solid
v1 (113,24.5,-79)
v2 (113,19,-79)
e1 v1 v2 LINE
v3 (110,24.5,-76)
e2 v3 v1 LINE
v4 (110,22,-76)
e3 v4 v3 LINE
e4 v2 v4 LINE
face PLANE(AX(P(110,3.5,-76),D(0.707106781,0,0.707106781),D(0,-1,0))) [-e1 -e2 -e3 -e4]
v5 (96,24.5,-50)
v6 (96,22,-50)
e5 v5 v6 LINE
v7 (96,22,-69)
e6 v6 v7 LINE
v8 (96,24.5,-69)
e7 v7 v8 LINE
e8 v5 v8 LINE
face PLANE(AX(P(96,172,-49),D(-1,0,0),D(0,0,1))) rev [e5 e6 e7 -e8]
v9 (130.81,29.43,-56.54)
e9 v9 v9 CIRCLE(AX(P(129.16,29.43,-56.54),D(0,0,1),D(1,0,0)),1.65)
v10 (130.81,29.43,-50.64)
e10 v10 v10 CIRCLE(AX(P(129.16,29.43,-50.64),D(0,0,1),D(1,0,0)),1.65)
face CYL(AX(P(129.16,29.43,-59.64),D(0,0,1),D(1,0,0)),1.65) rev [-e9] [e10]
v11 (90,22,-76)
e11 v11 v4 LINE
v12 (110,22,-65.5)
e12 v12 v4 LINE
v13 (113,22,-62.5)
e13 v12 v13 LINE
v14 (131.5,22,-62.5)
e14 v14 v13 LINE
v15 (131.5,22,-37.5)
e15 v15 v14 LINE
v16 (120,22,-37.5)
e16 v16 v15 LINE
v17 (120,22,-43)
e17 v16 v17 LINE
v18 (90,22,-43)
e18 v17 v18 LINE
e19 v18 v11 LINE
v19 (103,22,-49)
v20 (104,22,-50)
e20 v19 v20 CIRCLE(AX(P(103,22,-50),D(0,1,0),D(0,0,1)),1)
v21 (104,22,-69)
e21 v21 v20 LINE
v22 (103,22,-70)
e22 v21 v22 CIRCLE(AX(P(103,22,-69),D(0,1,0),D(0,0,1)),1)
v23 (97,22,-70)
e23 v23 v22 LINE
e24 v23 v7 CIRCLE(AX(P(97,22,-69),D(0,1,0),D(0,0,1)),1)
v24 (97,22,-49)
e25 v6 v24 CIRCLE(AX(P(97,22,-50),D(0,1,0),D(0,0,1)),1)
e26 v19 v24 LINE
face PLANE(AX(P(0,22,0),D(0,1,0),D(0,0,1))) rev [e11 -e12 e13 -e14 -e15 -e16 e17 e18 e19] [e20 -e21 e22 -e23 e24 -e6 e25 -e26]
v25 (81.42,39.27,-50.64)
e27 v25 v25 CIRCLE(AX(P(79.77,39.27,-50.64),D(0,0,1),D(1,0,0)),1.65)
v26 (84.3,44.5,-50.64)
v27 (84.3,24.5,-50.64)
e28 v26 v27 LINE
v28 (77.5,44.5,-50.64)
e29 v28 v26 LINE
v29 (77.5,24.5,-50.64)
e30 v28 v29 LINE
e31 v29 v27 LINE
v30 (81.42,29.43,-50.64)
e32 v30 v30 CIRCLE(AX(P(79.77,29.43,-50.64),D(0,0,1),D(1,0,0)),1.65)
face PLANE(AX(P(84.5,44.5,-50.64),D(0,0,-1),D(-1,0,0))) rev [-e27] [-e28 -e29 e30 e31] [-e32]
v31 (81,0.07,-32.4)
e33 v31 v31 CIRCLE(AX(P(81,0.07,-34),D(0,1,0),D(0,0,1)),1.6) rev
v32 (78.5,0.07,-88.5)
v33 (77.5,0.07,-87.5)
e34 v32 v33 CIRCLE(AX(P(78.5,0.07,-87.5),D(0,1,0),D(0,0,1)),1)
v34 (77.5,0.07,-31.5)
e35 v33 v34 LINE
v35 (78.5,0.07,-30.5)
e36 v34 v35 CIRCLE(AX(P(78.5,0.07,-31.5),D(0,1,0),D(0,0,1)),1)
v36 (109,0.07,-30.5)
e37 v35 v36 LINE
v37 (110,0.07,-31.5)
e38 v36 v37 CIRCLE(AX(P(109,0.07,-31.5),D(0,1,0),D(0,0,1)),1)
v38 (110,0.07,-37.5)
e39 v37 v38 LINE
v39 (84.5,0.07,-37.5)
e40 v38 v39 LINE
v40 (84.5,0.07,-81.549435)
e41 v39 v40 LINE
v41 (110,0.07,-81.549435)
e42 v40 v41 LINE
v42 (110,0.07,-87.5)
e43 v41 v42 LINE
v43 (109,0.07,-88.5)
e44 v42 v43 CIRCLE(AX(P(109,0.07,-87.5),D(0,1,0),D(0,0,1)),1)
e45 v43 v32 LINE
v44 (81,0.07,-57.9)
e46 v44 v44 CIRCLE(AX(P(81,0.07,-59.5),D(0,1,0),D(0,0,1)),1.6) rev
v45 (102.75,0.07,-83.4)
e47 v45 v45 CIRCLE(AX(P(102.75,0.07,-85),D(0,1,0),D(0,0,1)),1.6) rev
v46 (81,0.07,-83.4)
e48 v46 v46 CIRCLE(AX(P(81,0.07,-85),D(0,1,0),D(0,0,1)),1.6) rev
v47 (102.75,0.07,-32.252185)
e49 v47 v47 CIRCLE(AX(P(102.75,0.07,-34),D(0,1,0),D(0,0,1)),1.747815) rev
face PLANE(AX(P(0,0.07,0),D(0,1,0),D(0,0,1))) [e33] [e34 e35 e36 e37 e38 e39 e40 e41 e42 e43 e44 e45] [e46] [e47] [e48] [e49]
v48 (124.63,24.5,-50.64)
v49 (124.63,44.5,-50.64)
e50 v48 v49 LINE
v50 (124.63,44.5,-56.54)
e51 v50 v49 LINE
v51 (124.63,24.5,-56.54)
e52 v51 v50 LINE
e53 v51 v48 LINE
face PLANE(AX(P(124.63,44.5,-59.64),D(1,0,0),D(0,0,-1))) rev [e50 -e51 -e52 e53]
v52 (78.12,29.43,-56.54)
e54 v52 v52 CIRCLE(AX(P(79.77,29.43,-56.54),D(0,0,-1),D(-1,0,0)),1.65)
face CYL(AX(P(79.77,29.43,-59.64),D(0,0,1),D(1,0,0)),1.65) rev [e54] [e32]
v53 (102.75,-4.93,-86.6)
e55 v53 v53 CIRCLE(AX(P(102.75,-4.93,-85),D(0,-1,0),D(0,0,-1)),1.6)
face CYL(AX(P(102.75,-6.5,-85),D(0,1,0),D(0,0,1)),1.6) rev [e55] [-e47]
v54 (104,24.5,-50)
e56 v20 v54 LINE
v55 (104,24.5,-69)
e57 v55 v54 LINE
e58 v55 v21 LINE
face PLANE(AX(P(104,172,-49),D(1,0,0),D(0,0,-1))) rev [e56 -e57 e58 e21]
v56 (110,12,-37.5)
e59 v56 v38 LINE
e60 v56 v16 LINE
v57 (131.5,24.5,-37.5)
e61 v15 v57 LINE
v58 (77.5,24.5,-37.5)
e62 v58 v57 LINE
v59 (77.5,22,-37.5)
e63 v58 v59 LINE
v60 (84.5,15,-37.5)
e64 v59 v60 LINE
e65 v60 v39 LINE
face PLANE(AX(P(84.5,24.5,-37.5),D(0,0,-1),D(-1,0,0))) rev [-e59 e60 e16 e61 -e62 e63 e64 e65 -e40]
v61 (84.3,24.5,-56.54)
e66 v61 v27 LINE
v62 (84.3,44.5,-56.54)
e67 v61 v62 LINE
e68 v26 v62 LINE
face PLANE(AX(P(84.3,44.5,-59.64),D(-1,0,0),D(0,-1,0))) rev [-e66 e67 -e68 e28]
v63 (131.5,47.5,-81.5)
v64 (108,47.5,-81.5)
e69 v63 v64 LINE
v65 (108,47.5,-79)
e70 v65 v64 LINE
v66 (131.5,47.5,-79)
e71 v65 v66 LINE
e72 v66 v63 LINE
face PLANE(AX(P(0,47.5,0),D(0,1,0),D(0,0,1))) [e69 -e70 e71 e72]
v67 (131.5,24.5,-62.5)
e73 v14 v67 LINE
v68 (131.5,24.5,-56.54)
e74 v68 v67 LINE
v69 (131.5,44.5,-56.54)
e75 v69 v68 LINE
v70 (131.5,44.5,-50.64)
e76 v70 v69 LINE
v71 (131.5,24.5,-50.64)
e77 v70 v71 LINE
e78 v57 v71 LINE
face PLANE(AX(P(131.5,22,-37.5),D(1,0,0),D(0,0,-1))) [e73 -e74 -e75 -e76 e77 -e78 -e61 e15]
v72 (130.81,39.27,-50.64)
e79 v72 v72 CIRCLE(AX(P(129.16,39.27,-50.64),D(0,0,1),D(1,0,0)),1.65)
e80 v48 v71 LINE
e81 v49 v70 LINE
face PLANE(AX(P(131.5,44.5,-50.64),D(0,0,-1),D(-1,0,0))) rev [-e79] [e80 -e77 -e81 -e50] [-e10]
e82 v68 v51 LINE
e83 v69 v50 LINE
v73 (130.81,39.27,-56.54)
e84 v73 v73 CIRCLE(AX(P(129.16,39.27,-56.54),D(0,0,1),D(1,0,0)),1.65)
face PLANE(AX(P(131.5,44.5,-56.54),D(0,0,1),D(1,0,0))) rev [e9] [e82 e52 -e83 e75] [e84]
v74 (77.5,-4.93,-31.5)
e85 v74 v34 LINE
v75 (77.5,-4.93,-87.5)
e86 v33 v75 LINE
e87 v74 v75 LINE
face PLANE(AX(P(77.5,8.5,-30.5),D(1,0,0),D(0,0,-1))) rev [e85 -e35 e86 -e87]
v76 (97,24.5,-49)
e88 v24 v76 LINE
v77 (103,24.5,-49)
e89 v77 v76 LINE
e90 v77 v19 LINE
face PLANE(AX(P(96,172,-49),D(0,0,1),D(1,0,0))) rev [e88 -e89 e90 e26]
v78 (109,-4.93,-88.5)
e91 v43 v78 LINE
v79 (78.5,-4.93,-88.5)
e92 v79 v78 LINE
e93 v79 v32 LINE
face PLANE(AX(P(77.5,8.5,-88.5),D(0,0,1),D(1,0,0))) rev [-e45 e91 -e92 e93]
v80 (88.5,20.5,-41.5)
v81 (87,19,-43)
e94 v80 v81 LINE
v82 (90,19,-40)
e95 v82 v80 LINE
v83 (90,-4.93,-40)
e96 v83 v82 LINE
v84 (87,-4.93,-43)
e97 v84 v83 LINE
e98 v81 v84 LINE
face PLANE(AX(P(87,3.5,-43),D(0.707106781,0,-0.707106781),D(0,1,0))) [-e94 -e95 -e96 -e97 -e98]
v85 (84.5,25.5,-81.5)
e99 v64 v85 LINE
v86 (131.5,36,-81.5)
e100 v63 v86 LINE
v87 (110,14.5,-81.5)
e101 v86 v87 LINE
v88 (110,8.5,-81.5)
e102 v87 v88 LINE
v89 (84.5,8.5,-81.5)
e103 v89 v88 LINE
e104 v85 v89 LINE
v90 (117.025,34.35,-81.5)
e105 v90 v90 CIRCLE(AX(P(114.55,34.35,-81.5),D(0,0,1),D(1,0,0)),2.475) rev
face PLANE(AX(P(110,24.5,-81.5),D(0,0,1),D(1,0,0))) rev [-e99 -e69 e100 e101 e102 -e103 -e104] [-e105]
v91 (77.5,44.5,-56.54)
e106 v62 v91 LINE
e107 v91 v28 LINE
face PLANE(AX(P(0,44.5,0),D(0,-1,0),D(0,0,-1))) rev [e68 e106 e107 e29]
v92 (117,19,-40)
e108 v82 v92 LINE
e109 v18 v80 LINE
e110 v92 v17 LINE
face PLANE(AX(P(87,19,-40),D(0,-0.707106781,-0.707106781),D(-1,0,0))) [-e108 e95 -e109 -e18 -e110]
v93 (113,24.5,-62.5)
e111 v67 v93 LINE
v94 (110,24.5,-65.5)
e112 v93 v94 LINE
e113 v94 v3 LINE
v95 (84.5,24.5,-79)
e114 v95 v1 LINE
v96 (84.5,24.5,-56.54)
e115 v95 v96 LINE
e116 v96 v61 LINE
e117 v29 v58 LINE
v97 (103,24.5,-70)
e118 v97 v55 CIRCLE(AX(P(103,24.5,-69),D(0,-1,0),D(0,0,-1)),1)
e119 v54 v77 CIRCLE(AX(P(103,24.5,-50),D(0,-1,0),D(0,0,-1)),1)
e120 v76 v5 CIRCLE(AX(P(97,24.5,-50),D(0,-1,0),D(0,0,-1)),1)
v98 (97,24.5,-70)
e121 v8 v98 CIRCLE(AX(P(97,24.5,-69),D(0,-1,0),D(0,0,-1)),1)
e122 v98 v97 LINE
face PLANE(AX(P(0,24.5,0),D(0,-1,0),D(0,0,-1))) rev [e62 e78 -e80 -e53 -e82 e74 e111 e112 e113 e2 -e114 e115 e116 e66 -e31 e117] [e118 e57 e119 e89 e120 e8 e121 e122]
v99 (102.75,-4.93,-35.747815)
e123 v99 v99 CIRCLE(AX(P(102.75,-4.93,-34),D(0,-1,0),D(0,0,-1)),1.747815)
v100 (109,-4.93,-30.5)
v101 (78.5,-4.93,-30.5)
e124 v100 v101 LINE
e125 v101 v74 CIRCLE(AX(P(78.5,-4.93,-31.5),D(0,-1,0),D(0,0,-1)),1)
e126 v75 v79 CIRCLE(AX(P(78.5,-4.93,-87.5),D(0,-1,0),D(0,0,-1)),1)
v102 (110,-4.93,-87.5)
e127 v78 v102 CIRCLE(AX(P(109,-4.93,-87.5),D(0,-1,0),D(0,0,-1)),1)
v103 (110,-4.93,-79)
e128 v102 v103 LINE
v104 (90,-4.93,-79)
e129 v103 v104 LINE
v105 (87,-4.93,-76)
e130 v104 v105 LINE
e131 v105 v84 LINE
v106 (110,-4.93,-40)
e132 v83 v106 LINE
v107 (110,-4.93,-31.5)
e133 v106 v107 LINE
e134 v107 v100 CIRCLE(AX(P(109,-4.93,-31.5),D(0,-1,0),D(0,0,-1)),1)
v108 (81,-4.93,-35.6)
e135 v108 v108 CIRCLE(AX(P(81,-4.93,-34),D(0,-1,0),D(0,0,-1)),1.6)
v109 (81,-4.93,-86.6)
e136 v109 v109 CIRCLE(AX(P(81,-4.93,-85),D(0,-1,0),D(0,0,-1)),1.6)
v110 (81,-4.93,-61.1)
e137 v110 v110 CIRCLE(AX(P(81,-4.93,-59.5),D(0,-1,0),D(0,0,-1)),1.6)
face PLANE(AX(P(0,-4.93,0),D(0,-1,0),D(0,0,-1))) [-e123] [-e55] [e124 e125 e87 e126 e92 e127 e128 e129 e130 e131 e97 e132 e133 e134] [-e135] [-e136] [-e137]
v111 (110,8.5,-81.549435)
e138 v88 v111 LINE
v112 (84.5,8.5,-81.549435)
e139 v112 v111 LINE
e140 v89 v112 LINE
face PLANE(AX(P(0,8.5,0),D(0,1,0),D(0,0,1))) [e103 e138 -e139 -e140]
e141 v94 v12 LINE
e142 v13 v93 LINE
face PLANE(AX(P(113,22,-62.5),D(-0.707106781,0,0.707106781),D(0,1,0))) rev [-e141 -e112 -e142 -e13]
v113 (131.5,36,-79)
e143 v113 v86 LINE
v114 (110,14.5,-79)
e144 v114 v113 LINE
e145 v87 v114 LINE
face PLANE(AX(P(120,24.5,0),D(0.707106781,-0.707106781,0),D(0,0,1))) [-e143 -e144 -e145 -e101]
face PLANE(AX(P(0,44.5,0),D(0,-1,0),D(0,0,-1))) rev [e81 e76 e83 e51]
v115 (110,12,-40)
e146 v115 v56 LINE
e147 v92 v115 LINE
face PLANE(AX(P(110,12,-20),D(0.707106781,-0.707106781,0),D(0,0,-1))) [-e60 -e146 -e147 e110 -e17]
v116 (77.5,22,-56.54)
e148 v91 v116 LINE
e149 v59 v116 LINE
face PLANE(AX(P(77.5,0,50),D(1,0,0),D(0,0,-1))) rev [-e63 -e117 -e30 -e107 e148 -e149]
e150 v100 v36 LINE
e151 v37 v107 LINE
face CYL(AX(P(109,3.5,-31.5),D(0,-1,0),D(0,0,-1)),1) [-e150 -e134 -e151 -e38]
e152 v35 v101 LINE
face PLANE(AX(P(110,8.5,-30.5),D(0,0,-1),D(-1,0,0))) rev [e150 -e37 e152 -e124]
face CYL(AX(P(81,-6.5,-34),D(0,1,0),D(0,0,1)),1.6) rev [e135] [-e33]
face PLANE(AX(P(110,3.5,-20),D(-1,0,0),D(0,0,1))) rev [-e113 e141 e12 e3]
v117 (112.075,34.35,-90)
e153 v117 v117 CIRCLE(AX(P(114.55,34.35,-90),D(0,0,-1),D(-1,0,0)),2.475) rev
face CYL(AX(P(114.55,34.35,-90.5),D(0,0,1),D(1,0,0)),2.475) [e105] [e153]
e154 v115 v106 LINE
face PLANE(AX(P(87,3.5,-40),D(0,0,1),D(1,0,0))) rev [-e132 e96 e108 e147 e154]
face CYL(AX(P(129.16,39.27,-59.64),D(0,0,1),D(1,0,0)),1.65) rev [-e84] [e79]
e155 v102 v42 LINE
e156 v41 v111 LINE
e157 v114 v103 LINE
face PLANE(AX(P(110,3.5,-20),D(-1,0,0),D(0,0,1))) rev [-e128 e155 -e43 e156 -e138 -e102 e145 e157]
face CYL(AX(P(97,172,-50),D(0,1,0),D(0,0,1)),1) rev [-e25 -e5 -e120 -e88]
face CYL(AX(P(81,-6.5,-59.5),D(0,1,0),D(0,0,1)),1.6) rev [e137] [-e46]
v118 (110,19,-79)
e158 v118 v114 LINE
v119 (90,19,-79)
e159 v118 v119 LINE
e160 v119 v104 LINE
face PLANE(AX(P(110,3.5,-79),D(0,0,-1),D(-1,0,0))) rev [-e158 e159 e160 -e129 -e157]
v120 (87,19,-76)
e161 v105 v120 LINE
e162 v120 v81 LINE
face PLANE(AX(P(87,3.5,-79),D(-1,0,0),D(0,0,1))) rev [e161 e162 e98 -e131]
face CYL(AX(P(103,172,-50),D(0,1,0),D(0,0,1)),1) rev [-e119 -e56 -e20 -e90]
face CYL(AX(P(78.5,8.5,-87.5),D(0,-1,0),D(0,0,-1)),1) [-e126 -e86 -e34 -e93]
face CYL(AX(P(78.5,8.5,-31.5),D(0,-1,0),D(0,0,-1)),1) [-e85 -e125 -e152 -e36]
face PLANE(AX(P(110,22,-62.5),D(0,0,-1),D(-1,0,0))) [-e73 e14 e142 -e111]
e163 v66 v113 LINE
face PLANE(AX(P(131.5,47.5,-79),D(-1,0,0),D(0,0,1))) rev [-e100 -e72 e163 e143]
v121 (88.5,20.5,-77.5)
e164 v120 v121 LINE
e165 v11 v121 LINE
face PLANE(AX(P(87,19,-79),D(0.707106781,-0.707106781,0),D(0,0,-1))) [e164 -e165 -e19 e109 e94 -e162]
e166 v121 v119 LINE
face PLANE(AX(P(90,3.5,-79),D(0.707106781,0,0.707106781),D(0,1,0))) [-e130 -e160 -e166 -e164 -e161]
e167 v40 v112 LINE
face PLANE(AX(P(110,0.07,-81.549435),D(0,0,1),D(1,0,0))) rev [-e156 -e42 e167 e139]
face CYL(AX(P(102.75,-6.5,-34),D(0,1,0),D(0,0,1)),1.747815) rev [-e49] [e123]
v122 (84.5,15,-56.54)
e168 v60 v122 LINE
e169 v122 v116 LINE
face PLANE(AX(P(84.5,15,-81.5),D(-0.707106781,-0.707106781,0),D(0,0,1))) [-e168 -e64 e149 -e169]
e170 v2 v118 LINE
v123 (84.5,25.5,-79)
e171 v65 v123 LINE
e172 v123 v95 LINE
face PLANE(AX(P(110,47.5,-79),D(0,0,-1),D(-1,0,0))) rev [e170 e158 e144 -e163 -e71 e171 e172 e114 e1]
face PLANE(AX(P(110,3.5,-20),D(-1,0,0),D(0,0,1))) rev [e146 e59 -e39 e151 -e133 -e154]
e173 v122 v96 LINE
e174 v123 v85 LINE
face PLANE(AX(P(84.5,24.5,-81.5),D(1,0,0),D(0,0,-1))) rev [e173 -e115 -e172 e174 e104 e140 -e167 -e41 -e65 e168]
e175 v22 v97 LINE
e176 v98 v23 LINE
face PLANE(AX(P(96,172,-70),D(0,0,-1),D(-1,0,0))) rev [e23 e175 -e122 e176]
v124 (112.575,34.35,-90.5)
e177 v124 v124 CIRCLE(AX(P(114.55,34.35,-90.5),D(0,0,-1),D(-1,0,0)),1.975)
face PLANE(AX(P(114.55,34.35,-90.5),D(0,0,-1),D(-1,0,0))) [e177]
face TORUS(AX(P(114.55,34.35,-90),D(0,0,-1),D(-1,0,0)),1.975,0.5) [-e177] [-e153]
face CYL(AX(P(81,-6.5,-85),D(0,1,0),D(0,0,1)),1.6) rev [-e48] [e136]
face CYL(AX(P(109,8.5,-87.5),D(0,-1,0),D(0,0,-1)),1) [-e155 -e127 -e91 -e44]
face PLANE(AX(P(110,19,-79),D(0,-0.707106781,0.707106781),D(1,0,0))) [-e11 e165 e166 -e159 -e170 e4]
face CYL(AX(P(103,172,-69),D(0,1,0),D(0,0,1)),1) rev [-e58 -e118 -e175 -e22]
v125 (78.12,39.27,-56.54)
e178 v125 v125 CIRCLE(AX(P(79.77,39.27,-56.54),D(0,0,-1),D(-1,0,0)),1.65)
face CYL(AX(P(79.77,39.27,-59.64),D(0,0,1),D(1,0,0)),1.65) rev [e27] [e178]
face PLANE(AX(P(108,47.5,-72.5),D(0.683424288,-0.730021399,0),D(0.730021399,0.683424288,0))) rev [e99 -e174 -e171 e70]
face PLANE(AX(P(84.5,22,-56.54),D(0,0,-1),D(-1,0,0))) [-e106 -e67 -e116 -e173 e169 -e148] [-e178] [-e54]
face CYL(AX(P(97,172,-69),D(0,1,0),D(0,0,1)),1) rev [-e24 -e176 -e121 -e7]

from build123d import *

# Parameters (mm, degrees)
BOSS_EXTRUDE1_DEPTH  = 3.5
BOSS_EXTRUDE2_DEPTH  = 21
SKETCH3_W            = 23
SKETCH3_H            = 39
BOSS_EXTRUDE3_DEPTH  = 2.5
SKETCH5_W            = 21.5
SKETCH5_H            = 25
SKETCH5_W_2          = 7.07
SKETCH5_H_2          = 19.04
BOSS_EXTRUDE5_DEPTH  = 2.5
SKETCH6_W            = 7.07
SKETCH6_H            = 5.9
BOSS_EXTRUDE6_DEPTH  = 20
BOSS_EXTRUDE7_DEPTH  = 23
FILLET1_SIZE         = 10
SKETCH9_R            = 2.475
BOSS_EXTRUDE8_DEPTH  = 9
FILLET2_R            = 0.5
SKETCH10_R           = 1.65
CUT_EXTRUDE1_DEPTH   = 9
SKETCH11_W           = 0.2
SKETCH11_H           = 20
CUT_EXTRUDE2_DEPTH   = 9
CUT_EXTRUDE3_DEPTH   = 9
FILLET3_SIZE         = 3
BOSS_EXTRUDE9_DEPTH  = 5
SKETCH14_R           = 1.747814763
SKETCH14_R_2         = 1.6
CUT_EXTRUDE4_DEPTH   = 15
SKETCH15_W           = 110
SKETCH15_H           = 3.5
CUT_EXTRUDE5_DEPTH   = 150
FILLET4_SIZE         = 7
FILLET5_SIZE         = 3
FILLET6_SIZE         = 3
SKETCH17_W           = 8
SKETCH17_H           = 21
CUT_EXTRUDE6_DEPTH   = 150
FILLET7_R            = 1
FILLET9_SIZE         = 3
SKETCH19_R           = 1.747814763
SKETCH19_R_2         = 1.6
BOSS_EXTRUDE10_DEPTH = 8.43
CUT_EXTRUDE7_DEPTH   = 8.43
FILLET10_R           = 1


# Some blends are built 0.0001 mm under size
with BuildPart() as part:
    # Sketch1 → Boss-Extrude1 (new body)
    with BuildSketch(Plane(origin=(0, 0, 0), x_dir=(1, 0, 0), z_dir=(0, 1, 0))):
        Polygon((0, 40), (23, 40), (23, 79), (0, 79), (0, 100), (110, 100), (110, 79), (87, 79), (87, 40), (110, 40), (110, 20), (80, 0), (30, 0), (0, 20), align=None)
    extrude(amount=BOSS_EXTRUDE1_DEPTH)

    # Sketch2 → Boss-Extrude2 (add)
    with BuildSketch(Plane(origin=(0, 3.5, 0), x_dir=(1, 0, 0), z_dir=(0, 1, 0))):
        Polygon((0, 79), (23, 79), (23, 40), (0, 40), (0, 37.5), (25.5, 37.5), (25.5, 81.5), (0, 81.5), align=None)
        Polygon((110, 81.5), (84.5, 81.5), (84.5, 37.5), (110, 37.5), (110, 40), (87, 40), (87, 79), (110, 79), align=None)
    extrude(amount=BOSS_EXTRUDE2_DEPTH)

    # Sketch3 → Boss-Extrude3 (add)
    with BuildSketch(Plane(origin=(0, 24.5, 0), x_dir=(1, 0, 0), z_dir=(0, 1, 0))):
        with Locations((11.5, 59.5)):
            Rectangle(SKETCH3_W, SKETCH3_H)
        with Locations((98.5, 59.5)):
            Rectangle(SKETCH3_W, SKETCH3_H)
    extrude(amount=-BOSS_EXTRUDE3_DEPTH)

    # Sketch5 → Boss-Extrude5 (add)
    with BuildSketch(Plane(origin=(0, 24.5, 0), x_dir=(1, 0, 0), z_dir=(0, 1, 0))):
        with Locations((120.75, 50)):
            Rectangle(SKETCH5_W, SKETCH5_H)
        with Locations((-10.75, 50)):
            Rectangle(SKETCH5_W, SKETCH5_H)
        with Locations((29.035, 47.02)):
            Rectangle(SKETCH5_W_2, SKETCH5_H_2)
        with Locations((80.965, 47.02)):
            Rectangle(SKETCH5_W_2, SKETCH5_H_2)
    extrude(amount=-BOSS_EXTRUDE5_DEPTH)

    # Sketch6 → Boss-Extrude6 (add)
    with BuildSketch(Plane(origin=(0, 24.5, 0), x_dir=(1, 0, 0), z_dir=(0, 1, 0))):
        with Locations((29.035, 53.59)):
            Rectangle(SKETCH6_W, SKETCH6_H)
        with Locations((80.965, 53.59)):
            Rectangle(SKETCH6_W, SKETCH6_H)
        with Locations((-17.965, 53.59)):
            Rectangle(SKETCH6_W, SKETCH6_H)
        with Locations((127.965, 53.59)):
            Rectangle(SKETCH6_W, SKETCH6_H)
    extrude(amount=BOSS_EXTRUDE6_DEPTH)

    # Sketch7 → Boss-Extrude7 (add)
    with BuildSketch(Plane(origin=(0, 24.5, 0), x_dir=(1, 0, 0), z_dir=(0, 1, 0))):
        Polygon((0, 81.5), (25.5, 81.5), (25.5, 79), (0, 79), (-21.5, 79), (-21.5, 81.5), align=None)
        Polygon((110, 79), (84.5, 79), (84.5, 81.5), (110, 81.5), (131.5, 81.5), (131.5, 79), align=None)
    extrude(amount=BOSS_EXTRUDE7_DEPTH)

    # Fillet1
    # the kernel refuses this chamfer: 10 mm, written as the material it adds along each edge
    with BuildSketch(Plane(origin=(0, 22, -40), x_dir=(0.027495876610586372, -0.9996219169112968, 0), z_dir=(0, 0, 1)), Plane(origin=(110, 22, -37.5), x_dir=(-0.027495876610586317, -0.9996219169112968, 0), z_dir=(0, 0, -1)), Plane(origin=(110, 24.5, -81.5), x_dir=(0.9996219169112968, 0.027495876610586317, 0), z_dir=(0, 0, 1))) as fillet1_piece_1:
        Polygon((FILLET1_SIZE * 0.999621916911, -FILLET1_SIZE * 0.0274958766106), (-FILLET1_SIZE * 0.0274958766106, -FILLET1_SIZE * 0.999621916911), (0, 0), align=None)
    extrude(amount=2.5)
    with BuildSketch(Plane(origin=(0, 24.5, -79), x_dir=(0.027495876610586372, -0.9996219169112968, 0), z_dir=(0, 0, -1))) as fillet1_piece_2:
        Polygon((FILLET1_SIZE * 0.999621916911, FILLET1_SIZE * 0.0274958766106), (-FILLET1_SIZE * 0.0274958766106, FILLET1_SIZE * 0.999621916911), (0, 0), align=None)
    extrude(amount=2.5)

    # Sketch9 → Boss-Extrude8 (add)
    with BuildSketch(Plane(origin=(0, 0, -81.5), x_dir=(-1, 0, 0), z_dir=(0, 0, -1))):
        with Locations(Location((-114.55, 34.35, 0), (0, 0, 180))):
            Circle(SKETCH9_R)
        with Locations(Location((4.55, 34.35, 0), (0, 0, 180))):
            Circle(SKETCH9_R)
    extrude(amount=BOSS_EXTRUDE8_DEPTH)

    # Fillet2
    fillet2_edges = [part.edges().sort_by_distance(p)[0] for p in [
        (112.075, 34.35, -90.5),
        (-7.025, 34.35, -90.5),
    ]]
    fillet(fillet2_edges, radius=FILLET2_R)

    # Sketch10 → Cut-Extrude1 (cut)
    with BuildSketch(Plane.XY.offset(-50.64)):
        with Locations((129.16, 39.27)):
            Circle(SKETCH10_R)
        with Locations((129.16, 29.43)):
            Circle(SKETCH10_R)
        with Locations((79.77, 39.27)):
            Circle(SKETCH10_R)
        with Locations((79.77, 29.43)):
            Circle(SKETCH10_R)
        with Locations((-19.16, 29.43)):
            Circle(SKETCH10_R)
        with Locations((-19.16, 39.27)):
            Circle(SKETCH10_R)
        with Locations(Location((30.23, 39.27, 0), (0, 0, 180))):
            Circle(SKETCH10_R)
        with Locations(Location((30.23, 29.43, 0), (0, 0, 180))):
            Circle(SKETCH10_R)
    extrude(amount=-CUT_EXTRUDE1_DEPTH, mode=Mode.SUBTRACT)

    # Sketch11 → Cut-Extrude2 (cut)
    with BuildSketch(Plane.XY.offset(-50.64)):
        with Locations((-14.53, 34.5)):
            Rectangle(SKETCH11_W, SKETCH11_H)
        with Locations((25.6, 34.5)):
            Rectangle(SKETCH11_W, SKETCH11_H)
        with Locations((84.4, 34.5)):
            Rectangle(SKETCH11_W, SKETCH11_H)
        with Locations((124.53, 34.5)):
            Rectangle(SKETCH11_W, SKETCH11_H)
    extrude(amount=-CUT_EXTRUDE2_DEPTH, mode=Mode.SUBTRACT)

    # Sketch12 → Cut-Extrude3 (cut)
    with BuildSketch(Plane(origin=(0, 0, -81.5), x_dir=(-1, 0, 0), z_dir=(0, 0, -1))):
        Polygon((-108, 47.5), (-84.5, 25.5), (-84.5, 47.5), align=None)
        Polygon((-25.5, 25.5), (-25.5, 47.5), (-2, 47.5), align=None)
        Polygon((-120, 24.5), (-131.5, 36), (-131.5, 24.5), align=None)
        Polygon((10, 24.5), (21.5, 36), (21.5, 24.5), align=None)
    extrude(amount=-CUT_EXTRUDE3_DEPTH, mode=Mode.SUBTRACT)

    # Fillet3
    fillet3_edges = [part.edges().sort_by_distance(p)[0] for p in [
        (0, 23.25, -62.5),
        (110, 23.25, -62.5),
    ]]
    chamfer(fillet3_edges, length=FILLET3_SIZE)

    # Sketch13 → Boss-Extrude9 (add)
    with BuildSketch(Plane(origin=(0, 3.5, 0), x_dir=(1, 0, 0), z_dir=(0, 1, 0))):
        Polygon((0, 30.5), (32.5, 30.5), (32.5, 88.5), (0, 88.5), (0, 81.5), (25.5, 81.5), (25.5, 37.5), (0, 37.5), align=None)
        Polygon((84.5, 37.5), (110, 37.5), (110, 30.5), (77.5, 30.5), (77.5, 88.5), (110, 88.5), (110, 81.5), (84.5, 81.5), align=None)
    extrude(amount=BOSS_EXTRUDE9_DEPTH)

    # Sketch14 → Cut-Extrude4 (cut)
    with BuildSketch(Plane(origin=(0, 8.5, 0), x_dir=(1, 0, 0), z_dir=(0, 1, 0))):
        with Locations(Location((7.25, 34, 0), (0, 0, 270))):
            Circle(SKETCH14_R)
        with Locations(Location((7.25, 85, 0), (0, 0, 270))):
            Circle(SKETCH14_R_2)
        with Locations(Location((29, 34, 0), (0, 0, 270))):
            Circle(SKETCH14_R_2)
        with Locations(Location((29, 59.5, 0), (0, 0, 270))):
            Circle(SKETCH14_R_2)
        with Locations(Location((29, 85, 0), (0, 0, 270))):
            Circle(SKETCH14_R_2)
        with Locations(Location((81, 34, 0), (0, 0, 90))):
            Circle(SKETCH14_R_2)
        with Locations(Location((102.75, 34, 0), (0, 0, 90))):
            Circle(SKETCH14_R)
        with Locations(Location((81, 59.5, 0), (0, 0, 90))):
            Circle(SKETCH14_R_2)
        with Locations(Location((81, 85, 0), (0, 0, 90))):
            Circle(SKETCH14_R_2)
        with Locations(Location((102.75, 85, 0), (0, 0, 90))):
            Circle(SKETCH14_R_2)
    extrude(amount=-CUT_EXTRUDE4_DEPTH, mode=Mode.SUBTRACT)

    # Sketch15 → Cut-Extrude5 (cut)
    with BuildSketch(Plane(origin=(0, 0, -100), x_dir=(-1, 0, 0), z_dir=(0, 0, -1))):
        Polygon((-77.5, 47.5), (-77.5, 3.5), (0, 3.5), (21.5, 3.5), (21.5, 47.5), align=None)
        with Locations((-55, 1.75)):
            Rectangle(SKETCH15_W, SKETCH15_H)
    extrude(amount=-CUT_EXTRUDE5_DEPTH, mode=Mode.SUBTRACT)

    # Fillet4
    fillet4_edges = [part.edges().sort_by_distance(p)[0] for p in [
        (84.5, 22, -47.02),
    ]]
    chamfer(fillet4_edges, length=FILLET4_SIZE - 0.0001)  # a hair under: the kernel refuses the full size

    # Fillet5
    fillet5_edges = [part.edges().sort_by_distance(p)[0] for p in [
        (87, 22, -59.5),
        (98.5, 22, -79),
        (103.5, 22, -40),
    ]]
    chamfer(fillet5_edges, length=FILLET5_SIZE)

    # Fillet6
    fillet6_edges = [part.edges().sort_by_distance(p)[0] for p in [
        (110, 21.75, -79),
    ]]
    chamfer(fillet6_edges, length=FILLET6_SIZE)

    # Sketch17 → Cut-Extrude6 (cut)
    with BuildSketch(Plane.XZ.offset(-22)):
        with Locations((100, -59.5)):
            Rectangle(SKETCH17_W, SKETCH17_H)
    extrude(amount=-CUT_EXTRUDE6_DEPTH, mode=Mode.SUBTRACT)

    # Fillet7
    fillet7_edges = [part.edges().sort_by_distance(p)[0] for p in [
        (96, 23.25, -70),
        (96, 23.25, -49),
        (104, 23.25, -49),
        (104, 23.25, -70),
    ]]
    fillet(fillet7_edges, radius=FILLET7_R)

    # Fillet9
    fillet9_edges = [part.edges().sort_by_distance(p)[0] for p in [
        (87, 11.25, -79),
        (87, 11.25, -40),
    ]]
    chamfer(fillet9_edges, length=FILLET9_SIZE)

    # Sketch19 → Boss-Extrude10 (add)
    with BuildSketch(Plane.XZ.offset(-3.5)):
        Polygon((110, -40), (110, -30.5), (77.5, -30.5), (77.5, -88.5), (110, -88.5), (110, -79), (90, -79), (87, -76), (87, -43), (90, -40), align=None)
        with Locations(Location((102.75, -34, 0), (0, 0, 270))):
            Circle(SKETCH19_R, mode=Mode.SUBTRACT)
        with Locations(Location((81, -34, 0), (0, 0, 270))):
            Circle(SKETCH19_R_2, mode=Mode.SUBTRACT)
        with Locations(Location((81, -59.5, 0), (0, 0, 270))):
            Circle(SKETCH19_R_2, mode=Mode.SUBTRACT)
        with Locations(Location((81, -85, 0), (0, 0, 270))):
            Circle(SKETCH19_R_2, mode=Mode.SUBTRACT)
        with Locations(Location((102.75, -85, 0), (0, 0, 270))):
            Circle(SKETCH19_R_2, mode=Mode.SUBTRACT)
    extrude(amount=BOSS_EXTRUDE10_DEPTH)

    # Sketch20 → Cut-Extrude7 (cut)
    with BuildSketch(Plane(origin=(0, 8.5, 0), x_dir=(1, 0, 0), z_dir=(0, 1, 0))):
        Polygon((110, 88.5), (77.5, 88.5), (77.5, 81.549434768), (77.5, 30.5), (84.5, 30.5), (110, 30.5), (110, 37.5), (84.5, 37.5), (84.5, 81.549434768), (110, 81.549434768), align=None)
    extrude(amount=-CUT_EXTRUDE7_DEPTH, mode=Mode.SUBTRACT)

    # Fillet10
    fillet10_edges = [part.edges().sort_by_distance(p)[0] for p in [
        (77.5, -2.43, -30.5),
        (110, -2.43, -30.5),
        (77.5, -2.43, -88.5),
        (110, -2.43, -88.5),
    ]]
    fillet(fillet10_edges, radius=FILLET10_R)


solid = part.part
